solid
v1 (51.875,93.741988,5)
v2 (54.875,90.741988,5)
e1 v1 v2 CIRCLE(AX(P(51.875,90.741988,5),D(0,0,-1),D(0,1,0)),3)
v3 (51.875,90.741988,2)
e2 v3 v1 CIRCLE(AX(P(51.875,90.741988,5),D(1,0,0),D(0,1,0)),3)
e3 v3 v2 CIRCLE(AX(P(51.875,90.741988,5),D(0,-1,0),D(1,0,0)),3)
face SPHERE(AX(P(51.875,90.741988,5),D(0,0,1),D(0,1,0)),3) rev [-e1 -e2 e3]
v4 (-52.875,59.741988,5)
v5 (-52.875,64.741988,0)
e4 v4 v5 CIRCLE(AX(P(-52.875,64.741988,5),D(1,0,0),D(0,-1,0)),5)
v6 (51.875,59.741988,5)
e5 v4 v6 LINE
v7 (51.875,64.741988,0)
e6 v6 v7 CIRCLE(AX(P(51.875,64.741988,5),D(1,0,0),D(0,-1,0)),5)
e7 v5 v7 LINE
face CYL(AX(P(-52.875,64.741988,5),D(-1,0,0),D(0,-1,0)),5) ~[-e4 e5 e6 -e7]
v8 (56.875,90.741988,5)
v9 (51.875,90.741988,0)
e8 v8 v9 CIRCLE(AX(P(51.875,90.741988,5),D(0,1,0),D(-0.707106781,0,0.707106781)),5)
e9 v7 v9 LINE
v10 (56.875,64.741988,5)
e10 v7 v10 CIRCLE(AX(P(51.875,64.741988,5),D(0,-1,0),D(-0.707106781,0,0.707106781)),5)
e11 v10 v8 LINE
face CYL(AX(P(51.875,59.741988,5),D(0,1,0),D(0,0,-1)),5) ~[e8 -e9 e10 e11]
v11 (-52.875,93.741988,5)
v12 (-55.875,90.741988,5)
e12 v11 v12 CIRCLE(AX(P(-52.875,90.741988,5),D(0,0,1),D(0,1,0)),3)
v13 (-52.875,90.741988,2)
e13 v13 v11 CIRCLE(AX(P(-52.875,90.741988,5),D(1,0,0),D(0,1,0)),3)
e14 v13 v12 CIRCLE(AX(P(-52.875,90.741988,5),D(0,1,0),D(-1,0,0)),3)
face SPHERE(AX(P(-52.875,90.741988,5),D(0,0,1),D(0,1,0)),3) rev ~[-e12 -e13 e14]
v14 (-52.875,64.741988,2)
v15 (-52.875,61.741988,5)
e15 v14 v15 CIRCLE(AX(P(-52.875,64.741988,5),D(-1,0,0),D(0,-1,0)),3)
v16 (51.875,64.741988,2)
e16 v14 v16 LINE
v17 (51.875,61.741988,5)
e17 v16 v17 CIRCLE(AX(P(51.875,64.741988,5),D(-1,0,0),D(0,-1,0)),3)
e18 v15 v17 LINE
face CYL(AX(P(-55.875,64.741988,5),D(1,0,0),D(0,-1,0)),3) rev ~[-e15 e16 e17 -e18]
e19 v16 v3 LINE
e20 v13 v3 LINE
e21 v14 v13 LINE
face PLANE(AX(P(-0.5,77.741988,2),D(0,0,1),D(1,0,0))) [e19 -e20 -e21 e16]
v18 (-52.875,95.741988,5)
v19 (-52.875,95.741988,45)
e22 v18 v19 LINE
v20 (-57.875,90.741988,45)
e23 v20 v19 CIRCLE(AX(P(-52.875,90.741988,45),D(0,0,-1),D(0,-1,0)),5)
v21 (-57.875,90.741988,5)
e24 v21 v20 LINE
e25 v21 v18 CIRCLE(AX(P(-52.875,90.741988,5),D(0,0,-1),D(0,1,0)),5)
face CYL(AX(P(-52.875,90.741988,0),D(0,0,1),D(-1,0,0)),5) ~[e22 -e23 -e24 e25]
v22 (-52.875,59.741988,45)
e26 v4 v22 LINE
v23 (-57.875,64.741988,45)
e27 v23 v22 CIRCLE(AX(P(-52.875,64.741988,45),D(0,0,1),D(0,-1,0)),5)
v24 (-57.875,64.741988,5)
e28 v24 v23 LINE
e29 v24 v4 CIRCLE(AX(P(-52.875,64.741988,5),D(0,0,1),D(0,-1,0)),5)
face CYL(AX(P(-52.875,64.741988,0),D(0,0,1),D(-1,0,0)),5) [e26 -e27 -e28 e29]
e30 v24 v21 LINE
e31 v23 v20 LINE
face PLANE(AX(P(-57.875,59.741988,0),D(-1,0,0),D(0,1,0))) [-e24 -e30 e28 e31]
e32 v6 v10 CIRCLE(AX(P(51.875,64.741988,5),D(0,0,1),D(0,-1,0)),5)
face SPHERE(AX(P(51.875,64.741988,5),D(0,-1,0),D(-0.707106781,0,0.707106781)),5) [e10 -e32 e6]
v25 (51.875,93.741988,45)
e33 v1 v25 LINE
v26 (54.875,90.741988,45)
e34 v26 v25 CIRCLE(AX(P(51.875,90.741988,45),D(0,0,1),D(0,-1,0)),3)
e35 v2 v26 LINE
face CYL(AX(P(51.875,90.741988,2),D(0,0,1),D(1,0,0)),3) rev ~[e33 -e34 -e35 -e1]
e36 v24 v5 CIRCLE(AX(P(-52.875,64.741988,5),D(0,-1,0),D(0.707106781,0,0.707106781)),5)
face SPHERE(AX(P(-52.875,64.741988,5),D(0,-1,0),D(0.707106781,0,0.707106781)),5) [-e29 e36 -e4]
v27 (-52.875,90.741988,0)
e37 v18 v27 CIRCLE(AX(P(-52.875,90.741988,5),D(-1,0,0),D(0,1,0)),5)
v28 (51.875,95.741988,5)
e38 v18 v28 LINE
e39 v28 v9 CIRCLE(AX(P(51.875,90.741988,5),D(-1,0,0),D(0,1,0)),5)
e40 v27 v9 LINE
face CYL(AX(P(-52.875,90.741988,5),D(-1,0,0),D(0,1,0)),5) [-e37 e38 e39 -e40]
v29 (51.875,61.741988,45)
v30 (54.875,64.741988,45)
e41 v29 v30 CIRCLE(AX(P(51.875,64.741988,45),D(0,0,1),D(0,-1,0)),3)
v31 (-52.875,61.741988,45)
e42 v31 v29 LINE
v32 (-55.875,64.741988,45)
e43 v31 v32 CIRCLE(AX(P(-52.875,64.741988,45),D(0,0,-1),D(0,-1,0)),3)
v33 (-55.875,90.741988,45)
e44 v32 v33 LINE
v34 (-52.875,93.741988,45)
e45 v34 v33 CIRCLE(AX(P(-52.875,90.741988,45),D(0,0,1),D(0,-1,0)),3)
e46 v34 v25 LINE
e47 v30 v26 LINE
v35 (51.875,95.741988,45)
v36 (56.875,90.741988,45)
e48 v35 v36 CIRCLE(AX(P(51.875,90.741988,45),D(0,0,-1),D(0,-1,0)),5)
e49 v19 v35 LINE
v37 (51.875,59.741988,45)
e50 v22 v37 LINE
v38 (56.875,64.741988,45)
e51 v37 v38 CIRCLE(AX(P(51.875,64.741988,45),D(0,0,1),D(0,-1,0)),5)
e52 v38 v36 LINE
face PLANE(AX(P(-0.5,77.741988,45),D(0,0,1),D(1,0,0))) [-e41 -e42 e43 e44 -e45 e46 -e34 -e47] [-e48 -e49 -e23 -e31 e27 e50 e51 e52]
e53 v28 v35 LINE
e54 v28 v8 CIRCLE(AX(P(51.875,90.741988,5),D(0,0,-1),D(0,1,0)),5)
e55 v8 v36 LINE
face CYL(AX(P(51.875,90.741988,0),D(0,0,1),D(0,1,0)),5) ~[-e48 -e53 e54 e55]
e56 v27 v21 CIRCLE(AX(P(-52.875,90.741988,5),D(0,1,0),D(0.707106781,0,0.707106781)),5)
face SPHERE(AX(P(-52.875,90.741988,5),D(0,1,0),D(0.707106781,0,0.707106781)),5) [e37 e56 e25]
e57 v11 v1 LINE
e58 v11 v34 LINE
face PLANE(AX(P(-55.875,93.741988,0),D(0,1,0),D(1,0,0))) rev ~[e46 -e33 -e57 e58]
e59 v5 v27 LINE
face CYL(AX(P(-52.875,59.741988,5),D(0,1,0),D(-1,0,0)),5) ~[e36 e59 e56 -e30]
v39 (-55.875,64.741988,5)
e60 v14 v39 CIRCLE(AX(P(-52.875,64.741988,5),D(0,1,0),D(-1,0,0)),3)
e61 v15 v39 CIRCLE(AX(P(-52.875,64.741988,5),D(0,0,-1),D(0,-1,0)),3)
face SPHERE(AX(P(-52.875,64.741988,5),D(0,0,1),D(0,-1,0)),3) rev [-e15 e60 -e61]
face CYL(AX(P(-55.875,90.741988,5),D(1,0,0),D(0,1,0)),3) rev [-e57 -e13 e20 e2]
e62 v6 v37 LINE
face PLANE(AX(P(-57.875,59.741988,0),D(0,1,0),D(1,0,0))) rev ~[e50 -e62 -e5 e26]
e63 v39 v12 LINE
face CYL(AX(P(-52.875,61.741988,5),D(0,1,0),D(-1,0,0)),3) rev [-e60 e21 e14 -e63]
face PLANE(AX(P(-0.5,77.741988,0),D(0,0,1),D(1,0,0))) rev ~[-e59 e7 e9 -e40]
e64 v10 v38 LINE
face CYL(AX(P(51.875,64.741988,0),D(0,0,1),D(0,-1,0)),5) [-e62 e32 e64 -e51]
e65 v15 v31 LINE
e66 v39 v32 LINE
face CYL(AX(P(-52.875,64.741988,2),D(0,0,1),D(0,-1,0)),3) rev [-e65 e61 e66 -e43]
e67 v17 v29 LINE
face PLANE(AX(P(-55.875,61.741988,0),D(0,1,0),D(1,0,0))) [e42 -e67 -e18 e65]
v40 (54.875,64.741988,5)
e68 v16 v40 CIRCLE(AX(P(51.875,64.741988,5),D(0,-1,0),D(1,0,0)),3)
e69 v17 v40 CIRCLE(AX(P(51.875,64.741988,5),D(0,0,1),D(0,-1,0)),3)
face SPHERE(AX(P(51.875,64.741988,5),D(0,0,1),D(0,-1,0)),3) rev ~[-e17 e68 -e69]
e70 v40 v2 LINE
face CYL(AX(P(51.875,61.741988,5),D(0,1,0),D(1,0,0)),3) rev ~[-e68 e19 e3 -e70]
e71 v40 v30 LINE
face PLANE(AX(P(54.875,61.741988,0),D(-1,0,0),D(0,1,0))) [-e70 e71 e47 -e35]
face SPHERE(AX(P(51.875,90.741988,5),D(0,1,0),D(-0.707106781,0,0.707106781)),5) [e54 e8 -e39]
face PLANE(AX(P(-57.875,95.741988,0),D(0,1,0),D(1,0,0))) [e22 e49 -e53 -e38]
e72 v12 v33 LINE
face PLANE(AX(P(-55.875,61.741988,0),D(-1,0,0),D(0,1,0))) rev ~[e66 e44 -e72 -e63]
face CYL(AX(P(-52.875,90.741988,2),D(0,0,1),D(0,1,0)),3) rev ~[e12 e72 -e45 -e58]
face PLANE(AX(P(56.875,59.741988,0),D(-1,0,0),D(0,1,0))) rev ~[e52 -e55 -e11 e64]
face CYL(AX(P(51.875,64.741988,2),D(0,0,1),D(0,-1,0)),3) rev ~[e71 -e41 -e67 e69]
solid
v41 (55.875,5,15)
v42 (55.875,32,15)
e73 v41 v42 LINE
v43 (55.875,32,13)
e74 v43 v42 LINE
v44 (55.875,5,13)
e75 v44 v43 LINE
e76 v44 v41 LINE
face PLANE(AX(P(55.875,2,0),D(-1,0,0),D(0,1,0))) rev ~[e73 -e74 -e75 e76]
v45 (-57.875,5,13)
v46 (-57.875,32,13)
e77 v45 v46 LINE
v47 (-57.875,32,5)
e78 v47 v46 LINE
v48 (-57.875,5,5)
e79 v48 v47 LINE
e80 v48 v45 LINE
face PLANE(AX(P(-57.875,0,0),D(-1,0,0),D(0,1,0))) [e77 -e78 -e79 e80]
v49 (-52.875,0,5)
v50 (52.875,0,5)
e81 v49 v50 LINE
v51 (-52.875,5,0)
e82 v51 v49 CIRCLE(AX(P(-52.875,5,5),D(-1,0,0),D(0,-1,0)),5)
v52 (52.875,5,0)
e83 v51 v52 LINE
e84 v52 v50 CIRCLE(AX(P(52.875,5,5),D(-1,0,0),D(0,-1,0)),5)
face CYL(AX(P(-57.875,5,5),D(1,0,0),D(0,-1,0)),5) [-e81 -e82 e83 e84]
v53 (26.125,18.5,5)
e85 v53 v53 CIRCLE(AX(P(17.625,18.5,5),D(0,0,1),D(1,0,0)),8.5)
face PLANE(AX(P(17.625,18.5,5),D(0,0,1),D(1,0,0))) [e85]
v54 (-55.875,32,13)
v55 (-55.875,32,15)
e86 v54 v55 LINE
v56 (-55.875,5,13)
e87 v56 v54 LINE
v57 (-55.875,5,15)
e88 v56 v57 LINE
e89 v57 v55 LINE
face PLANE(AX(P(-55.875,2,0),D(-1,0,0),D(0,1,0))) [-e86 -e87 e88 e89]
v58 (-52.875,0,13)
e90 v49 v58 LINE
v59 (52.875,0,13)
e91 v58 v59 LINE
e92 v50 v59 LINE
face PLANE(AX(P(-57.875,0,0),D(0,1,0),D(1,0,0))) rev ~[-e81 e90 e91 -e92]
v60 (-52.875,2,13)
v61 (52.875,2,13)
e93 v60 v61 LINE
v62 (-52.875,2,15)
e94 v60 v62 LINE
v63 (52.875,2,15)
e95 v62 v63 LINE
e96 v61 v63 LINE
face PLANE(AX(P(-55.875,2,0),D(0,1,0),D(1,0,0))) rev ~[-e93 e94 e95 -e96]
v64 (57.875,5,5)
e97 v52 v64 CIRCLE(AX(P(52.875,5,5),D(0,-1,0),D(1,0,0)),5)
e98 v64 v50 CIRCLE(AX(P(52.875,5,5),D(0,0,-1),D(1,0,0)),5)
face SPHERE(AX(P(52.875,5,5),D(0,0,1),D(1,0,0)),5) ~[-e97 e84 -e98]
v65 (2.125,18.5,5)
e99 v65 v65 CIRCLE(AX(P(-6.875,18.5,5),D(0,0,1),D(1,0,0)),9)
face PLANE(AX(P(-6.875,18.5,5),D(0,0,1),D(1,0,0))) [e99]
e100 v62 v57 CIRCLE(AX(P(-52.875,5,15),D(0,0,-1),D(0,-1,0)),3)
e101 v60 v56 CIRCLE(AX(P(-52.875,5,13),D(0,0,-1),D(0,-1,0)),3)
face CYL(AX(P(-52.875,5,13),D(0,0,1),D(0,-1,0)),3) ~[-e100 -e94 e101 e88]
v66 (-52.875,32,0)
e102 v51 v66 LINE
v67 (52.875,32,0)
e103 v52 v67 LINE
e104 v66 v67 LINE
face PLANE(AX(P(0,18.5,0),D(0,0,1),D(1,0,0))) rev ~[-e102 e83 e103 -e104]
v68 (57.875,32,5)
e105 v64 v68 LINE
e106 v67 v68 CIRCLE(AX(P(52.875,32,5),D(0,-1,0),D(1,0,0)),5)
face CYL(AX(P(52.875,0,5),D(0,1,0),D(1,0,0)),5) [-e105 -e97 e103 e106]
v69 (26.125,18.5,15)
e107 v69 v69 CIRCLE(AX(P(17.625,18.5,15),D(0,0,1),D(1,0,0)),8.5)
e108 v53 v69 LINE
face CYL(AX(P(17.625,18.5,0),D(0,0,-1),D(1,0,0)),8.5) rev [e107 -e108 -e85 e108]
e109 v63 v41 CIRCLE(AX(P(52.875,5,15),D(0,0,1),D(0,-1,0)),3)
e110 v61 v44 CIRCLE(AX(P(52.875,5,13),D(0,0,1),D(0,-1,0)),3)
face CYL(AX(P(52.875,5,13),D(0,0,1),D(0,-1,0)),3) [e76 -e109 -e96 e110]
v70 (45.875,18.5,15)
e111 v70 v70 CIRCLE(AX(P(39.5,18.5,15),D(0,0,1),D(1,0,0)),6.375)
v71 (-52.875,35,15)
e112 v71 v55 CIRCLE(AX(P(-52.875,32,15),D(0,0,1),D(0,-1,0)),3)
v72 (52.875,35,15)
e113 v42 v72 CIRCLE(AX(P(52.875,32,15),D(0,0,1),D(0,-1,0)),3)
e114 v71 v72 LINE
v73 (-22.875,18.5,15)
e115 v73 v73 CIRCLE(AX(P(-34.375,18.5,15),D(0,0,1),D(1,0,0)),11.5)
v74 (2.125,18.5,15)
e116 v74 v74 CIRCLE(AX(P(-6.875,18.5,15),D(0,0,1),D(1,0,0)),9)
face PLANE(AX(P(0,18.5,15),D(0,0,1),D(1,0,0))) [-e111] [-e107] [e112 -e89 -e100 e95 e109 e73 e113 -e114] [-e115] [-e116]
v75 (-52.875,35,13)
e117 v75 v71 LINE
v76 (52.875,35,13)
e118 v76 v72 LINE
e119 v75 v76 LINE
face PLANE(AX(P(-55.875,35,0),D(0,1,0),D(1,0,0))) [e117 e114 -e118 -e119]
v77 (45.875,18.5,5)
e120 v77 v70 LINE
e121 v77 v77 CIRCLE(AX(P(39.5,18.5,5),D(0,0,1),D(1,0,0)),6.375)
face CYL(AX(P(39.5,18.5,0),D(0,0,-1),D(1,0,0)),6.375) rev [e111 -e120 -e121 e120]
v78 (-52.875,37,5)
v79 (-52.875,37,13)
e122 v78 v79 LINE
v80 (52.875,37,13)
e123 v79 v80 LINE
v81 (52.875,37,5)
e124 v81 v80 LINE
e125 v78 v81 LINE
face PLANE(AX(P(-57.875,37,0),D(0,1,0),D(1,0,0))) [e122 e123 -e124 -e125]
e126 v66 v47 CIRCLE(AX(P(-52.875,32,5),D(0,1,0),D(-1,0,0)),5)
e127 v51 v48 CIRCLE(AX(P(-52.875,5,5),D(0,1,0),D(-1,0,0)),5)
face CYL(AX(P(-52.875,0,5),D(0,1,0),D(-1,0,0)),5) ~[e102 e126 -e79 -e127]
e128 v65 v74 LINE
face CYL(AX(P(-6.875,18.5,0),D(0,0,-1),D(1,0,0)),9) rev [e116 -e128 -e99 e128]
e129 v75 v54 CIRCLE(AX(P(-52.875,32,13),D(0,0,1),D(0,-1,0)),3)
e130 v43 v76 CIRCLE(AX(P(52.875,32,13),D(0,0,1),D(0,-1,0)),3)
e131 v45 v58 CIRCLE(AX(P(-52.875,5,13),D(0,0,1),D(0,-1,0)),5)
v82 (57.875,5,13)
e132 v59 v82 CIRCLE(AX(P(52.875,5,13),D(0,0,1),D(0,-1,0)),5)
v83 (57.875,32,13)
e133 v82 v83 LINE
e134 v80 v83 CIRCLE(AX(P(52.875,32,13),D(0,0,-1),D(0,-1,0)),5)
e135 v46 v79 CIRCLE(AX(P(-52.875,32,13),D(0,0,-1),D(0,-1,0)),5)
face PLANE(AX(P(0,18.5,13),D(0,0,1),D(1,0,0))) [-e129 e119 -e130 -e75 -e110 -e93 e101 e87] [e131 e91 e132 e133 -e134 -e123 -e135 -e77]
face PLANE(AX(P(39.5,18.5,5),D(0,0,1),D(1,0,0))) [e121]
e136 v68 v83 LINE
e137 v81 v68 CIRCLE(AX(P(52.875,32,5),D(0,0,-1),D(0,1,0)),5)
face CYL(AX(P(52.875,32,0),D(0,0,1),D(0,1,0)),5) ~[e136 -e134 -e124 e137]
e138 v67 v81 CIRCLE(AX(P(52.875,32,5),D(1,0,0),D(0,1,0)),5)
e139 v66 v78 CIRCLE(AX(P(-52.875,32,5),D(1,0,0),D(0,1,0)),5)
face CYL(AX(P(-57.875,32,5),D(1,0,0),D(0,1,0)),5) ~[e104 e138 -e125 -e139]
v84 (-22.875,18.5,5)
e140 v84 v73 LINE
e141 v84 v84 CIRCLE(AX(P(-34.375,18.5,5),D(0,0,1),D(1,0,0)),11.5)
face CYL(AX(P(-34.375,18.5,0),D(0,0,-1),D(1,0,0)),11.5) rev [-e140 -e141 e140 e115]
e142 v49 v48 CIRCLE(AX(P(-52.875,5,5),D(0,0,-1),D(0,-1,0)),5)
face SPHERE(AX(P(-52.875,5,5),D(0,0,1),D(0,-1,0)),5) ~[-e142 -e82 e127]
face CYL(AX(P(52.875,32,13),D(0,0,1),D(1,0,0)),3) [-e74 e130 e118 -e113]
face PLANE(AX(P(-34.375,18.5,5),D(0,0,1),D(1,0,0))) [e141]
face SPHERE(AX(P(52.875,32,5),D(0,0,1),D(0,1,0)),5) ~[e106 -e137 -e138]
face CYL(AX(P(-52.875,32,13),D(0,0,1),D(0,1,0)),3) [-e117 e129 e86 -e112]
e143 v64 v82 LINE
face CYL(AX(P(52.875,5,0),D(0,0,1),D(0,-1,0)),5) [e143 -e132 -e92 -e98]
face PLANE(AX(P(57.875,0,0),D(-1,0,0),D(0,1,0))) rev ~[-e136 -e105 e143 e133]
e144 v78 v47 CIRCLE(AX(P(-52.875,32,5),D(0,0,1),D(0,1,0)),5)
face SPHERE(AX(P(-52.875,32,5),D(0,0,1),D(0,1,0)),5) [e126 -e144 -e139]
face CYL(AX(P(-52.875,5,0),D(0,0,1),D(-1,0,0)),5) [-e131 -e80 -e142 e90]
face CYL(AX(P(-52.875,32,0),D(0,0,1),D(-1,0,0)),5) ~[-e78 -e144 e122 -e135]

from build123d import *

# Parameters (mm, degrees)
F0_R          = 11.5
F1_DEPTH      = 5
F0_R_2        = 9
F0_R_3        = 8.5
F0_R_4        = 6.375
F0_W          = 115.75
F0_H          = 37
F0_W_2        = 111.75
F0_H_2        = 33
F2_DEPTH      = 13
F3_DEPTH      = 15
F4_W          = 110.75
F4_H          = 32
F5_DEPTH      = 2
F4_W_2        = 114.75
F4_H_2        = 36
F6_DEPTH      = 45
F7_R          = 5
F7_2_R        = 5
F8_R          = 3
F8_2_R        = 3
F10_T1_DEPTH  = 104.75
F10_S5_W      = 5
F10_S5_H      = 5
F10_T6_DEPTH  = 5
F10_S11_W     = 5
F10_S11_H     = 5
F10_T12_DEPTH = 5
F10_S17_W     = 5
F10_S17_H     = 5
F10_T18_DEPTH = 5
F10_S23_W     = 5
F10_S23_H     = 5
F10_T24_DEPTH = 5


# Not quite as in the source:
# - a fillet or chamfer that OpenCascade refuses, or shapes differently, is made with other operations: its cross-section is extruded or revolved along the edge and cut away or added


with BuildPart() as f1:
    # F0 (on Top) → F1 (new body)
    with BuildSketch(Plane.XY):
        with Locations((-34.375, 18.5)):
            Circle(F0_R)
    extrude(amount=F1_DEPTH)



with BuildPart() as f1b:
    # F0 (on Top) → F1, piece 2 (new body)
    with BuildSketch(Plane.XY):
        with Locations((-6.875, 18.5)):
            Circle(F0_R_2)
    extrude(amount=F1_DEPTH)


with BuildPart() as f1c:
    # F0 (on Top) → F1, piece 3 (new body)
    with BuildSketch(Plane.XY):
        with Locations((17.625, 18.5)):
            Circle(F0_R_3)
    extrude(amount=F1_DEPTH)


with BuildPart() as f1d:
    # F0 (on Top) → F1, piece 4 (new body)
    with BuildSketch(Plane.XY):
        with Locations((39.5, 18.5)):
            Circle(F0_R_4)
    extrude(amount=F1_DEPTH)


with BuildPart() as f2:
    # F0 (on Top) → F2 (new body)
    with BuildSketch(Plane.XY):
        with Locations((0, 18.5)):
            Rectangle(F0_W, F0_H)
        with Locations((0, 18.5)):
            Rectangle(F0_W_2, F0_H_2, mode=Mode.SUBTRACT)
    extrude(amount=F2_DEPTH)


with BuildPart() as f1_1:
    add(f1.part)

    add(f1b.part)  # F3 merges F1b

    add(f1c.part)  # F3 merges F1c

    add(f1d.part)  # F3 merges F1d

    add(f2.part)  # F3 merges F2
    # F0 (on Top) → F3 (join)
    with BuildSketch(Plane.XY):
        with Locations((0, 18.5)):
            Rectangle(F0_W_2, F0_H_2)
        with Locations((-34.375, 18.5)):
            Circle(F0_R, mode=Mode.SUBTRACT)
        with Locations((-6.875, 18.5)):
            Circle(F0_R_2, mode=Mode.SUBTRACT)
        with Locations((17.625, 18.5)):
            Circle(F0_R_3, mode=Mode.SUBTRACT)
        with Locations((39.5, 18.5)):
            Circle(F0_R_4, mode=Mode.SUBTRACT)
    extrude(amount=F3_DEPTH)

    # F7
    f7_edges = [f1_1.edges().sort_by_distance(p)[0] for p in [
        (-57.875, 37, 6.5),
        (-57.875, 0, 6.5),
        (57.875, 0, 6.5),
        (57.875, 37, 6.5),
        (0, 37, 0),
        (57.875, 18.5, 0),
        (0, 0, 0),
        (-57.875, 18.5, 0),
    ]]
    fillet(f7_edges, radius=F7_R)

    # F8
    f8_edges = [f1_1.edges().sort_by_distance(p)[0] for p in [
        (55.875, 35, 14),
        (55.875, 2, 14),
        (-55.875, 35, 14),
        (-55.875, 2, 14),
    ]]
    fillet(f8_edges, radius=F8_R)


with BuildPart() as f5:
    # F4 (on Top) → F5 (new body)
    with BuildSketch(Plane.XY):
        with Locations((-0.5, -22.2580123227)):
            Rectangle(F4_W, F4_H)
    extrude(amount=F5_DEPTH)

    # F4 (on Top) → F6 (join)
    with BuildSketch(Plane.XY):
        with Locations((-0.5, -22.2580123227)):
            Rectangle(F4_W_2, F4_H_2)
        with Locations((-0.5, -22.2580123227)):
            Rectangle(F4_W, F4_H, mode=Mode.SUBTRACT)
    extrude(amount=F6_DEPTH)

    # F7#2
    f7_2_edges = [f5.edges().sort_by_distance(p)[0] for p in [
        (56.875, -4.258012, 22.5),
        (56.875, -40.258012, 22.5),
        (-57.875, -4.258012, 22.5),
        (-57.875, -40.258012, 22.5),
        (-57.875, -22.258012, 0),
        (56.875, -22.258012, 0),
    ]]
    fillet(f7_2_edges, radius=F7_2_R)

    # F8#2
    f8_2_edges = [f5.edges().sort_by_distance(p)[0] for p in [
        (-55.875, -38.258012, 23.5),
        (-55.875, -6.258012, 23.5),
        (54.875, -38.258012, 23.5),
        (54.875, -6.258012, 23.5),
        (-0.5, -6.258012, 2),
        (-0.5, -38.258012, 2),
        (-55.875, -22.258012, 2),
        (54.875, -22.258012, 2),
    ]]
    fillet(f8_2_edges, radius=F8_2_R)


with BuildPart() as f5_1:
    # F9: moved
    add(f5.part.moved(Location((0, 100, 0))))

    # F10: fillet of radius 5 on 2 edges, made by hand

    # F10_s2 → F10_t1 (cut)
    with BuildSketch(Plane.YZ.offset(-52.875)):
        with BuildLine():
            ThreePointArc((95.7419876773, 5), (94.2775215832, 1.4644660941), (90.7419876773, 0))
            Line((90.7419876773, 0), (95.7419876773, 0))
            Line((95.7419876773, 0), (95.7419876773, 5))
        make_face()
        with BuildLine():
            ThreePointArc((59.7419876773, 5), (61.2064537714, 1.4644660941), (64.7419876773, 0))
            Line((64.7419876773, 0), (59.7419876773, 0))
            Line((59.7419876773, 0), (59.7419876773, 5))
        make_face()
    extrude(amount=F10_T1_DEPTH, mode=Mode.SUBTRACT)


with BuildPart() as f10_tool4:
    # F10_s5 → F10_t6 (new body)
    with BuildSketch(Plane.XZ.offset(-64.7419876773)):
        with Locations((-55.375, 2.5)):
            Rectangle(F10_S5_W, F10_S5_H)
    extrude(amount=F10_T6_DEPTH)

    # F10_s7 → F10_t8 (revolve, cut)
    with BuildSketch(Plane(origin=(-52.875, 64.7419876773, 5), x_dir=(0.7071067812, 0, 0.7071067812), z_dir=(0.7071067812, 0, -0.7071067812))):
        with BuildLine():
            ThreePointArc((0, -5), (5, 0), (0, 5))
            Line((0, 5), (0, -5))
        make_face()
    revolve(axis=Axis((-52.875, 64.7419876773, 5), (0, -1, 0)), mode=Mode.SUBTRACT)


with BuildPart() as f5_2:
    add(f5_1.part)

    # F10_t3: cut F10_tool4
    add(f10_tool4.part, mode=Mode.SUBTRACT)


with BuildPart() as f10_tool10:
    # F10_s11 → F10_t12 (new body)
    with BuildSketch(Plane.XZ.offset(-64.7419876773)):
        with Locations((54.375, 2.5)):
            Rectangle(F10_S11_W, F10_S11_H)
    extrude(amount=F10_T12_DEPTH)

    # F10_s13 → F10_t14 (revolve, cut)
    with BuildSketch(Plane(origin=(51.875, 64.7419876773, 5), x_dir=(-0.7071067812, 0, 0.7071067812), z_dir=(0.7071067812, 0, 0.7071067812))):
        with BuildLine():
            ThreePointArc((0, -5), (5, 0), (0, 5))
            Line((0, 5), (0, -5))
        make_face()
    revolve(axis=Axis((51.875, 64.7419876773, 5), (0, -1, 0)), mode=Mode.SUBTRACT)


with BuildPart() as f5_3:
    add(f5_2.part)

    # F10_t9: cut F10_tool10
    add(f10_tool10.part, mode=Mode.SUBTRACT)


with BuildPart() as f10_tool16:
    # F10_s17 → F10_t18 (new body)
    with BuildSketch(Plane.XZ.offset(-90.7419876773)):
        with Locations((54.375, 2.5)):
            Rectangle(F10_S17_W, F10_S17_H)
    extrude(amount=-F10_T18_DEPTH)

    # F10_s19 → F10_t20 (revolve, cut)
    with BuildSketch(Plane(origin=(51.875, 90.7419876773, 5), x_dir=(-0.7071067812, 0, 0.7071067812), z_dir=(-0.7071067812, 0, -0.7071067812))):
        with BuildLine():
            ThreePointArc((0, -5), (5, 0), (0, 5))
            Line((0, 5), (0, -5))
        make_face()
    revolve(axis=Axis((51.875, 90.7419876773, 5), (0, 1, 0)), mode=Mode.SUBTRACT)


with BuildPart() as f5_4:
    add(f5_3.part)

    # F10_t15: cut F10_tool16
    add(f10_tool16.part, mode=Mode.SUBTRACT)


with BuildPart() as f10_tool22:
    # F10_s23 → F10_t24 (new body)
    with BuildSketch(Plane.XZ.offset(-90.7419876773)):
        with Locations((-55.375, 2.5)):
            Rectangle(F10_S23_W, F10_S23_H)
    extrude(amount=-F10_T24_DEPTH)

    # F10_s25 → F10_t26 (revolve, cut)
    with BuildSketch(Plane(origin=(-52.875, 90.7419876773, 5), x_dir=(0.7071067812, 0, 0.7071067812), z_dir=(-0.7071067812, 0, 0.7071067812))):
        with BuildLine():
            ThreePointArc((0, -5), (5, 0), (0, 5))
            Line((0, 5), (0, -5))
        make_face()
    revolve(axis=Axis((-52.875, 90.7419876773, 5), (0, 1, 0)), mode=Mode.SUBTRACT)


with BuildPart() as f5_5:
    add(f5_4.part)

    # F10_t21: cut F10_tool22
    add(f10_tool22.part, mode=Mode.SUBTRACT)


solid = Compound([f1_1.part, f5_5.part])
